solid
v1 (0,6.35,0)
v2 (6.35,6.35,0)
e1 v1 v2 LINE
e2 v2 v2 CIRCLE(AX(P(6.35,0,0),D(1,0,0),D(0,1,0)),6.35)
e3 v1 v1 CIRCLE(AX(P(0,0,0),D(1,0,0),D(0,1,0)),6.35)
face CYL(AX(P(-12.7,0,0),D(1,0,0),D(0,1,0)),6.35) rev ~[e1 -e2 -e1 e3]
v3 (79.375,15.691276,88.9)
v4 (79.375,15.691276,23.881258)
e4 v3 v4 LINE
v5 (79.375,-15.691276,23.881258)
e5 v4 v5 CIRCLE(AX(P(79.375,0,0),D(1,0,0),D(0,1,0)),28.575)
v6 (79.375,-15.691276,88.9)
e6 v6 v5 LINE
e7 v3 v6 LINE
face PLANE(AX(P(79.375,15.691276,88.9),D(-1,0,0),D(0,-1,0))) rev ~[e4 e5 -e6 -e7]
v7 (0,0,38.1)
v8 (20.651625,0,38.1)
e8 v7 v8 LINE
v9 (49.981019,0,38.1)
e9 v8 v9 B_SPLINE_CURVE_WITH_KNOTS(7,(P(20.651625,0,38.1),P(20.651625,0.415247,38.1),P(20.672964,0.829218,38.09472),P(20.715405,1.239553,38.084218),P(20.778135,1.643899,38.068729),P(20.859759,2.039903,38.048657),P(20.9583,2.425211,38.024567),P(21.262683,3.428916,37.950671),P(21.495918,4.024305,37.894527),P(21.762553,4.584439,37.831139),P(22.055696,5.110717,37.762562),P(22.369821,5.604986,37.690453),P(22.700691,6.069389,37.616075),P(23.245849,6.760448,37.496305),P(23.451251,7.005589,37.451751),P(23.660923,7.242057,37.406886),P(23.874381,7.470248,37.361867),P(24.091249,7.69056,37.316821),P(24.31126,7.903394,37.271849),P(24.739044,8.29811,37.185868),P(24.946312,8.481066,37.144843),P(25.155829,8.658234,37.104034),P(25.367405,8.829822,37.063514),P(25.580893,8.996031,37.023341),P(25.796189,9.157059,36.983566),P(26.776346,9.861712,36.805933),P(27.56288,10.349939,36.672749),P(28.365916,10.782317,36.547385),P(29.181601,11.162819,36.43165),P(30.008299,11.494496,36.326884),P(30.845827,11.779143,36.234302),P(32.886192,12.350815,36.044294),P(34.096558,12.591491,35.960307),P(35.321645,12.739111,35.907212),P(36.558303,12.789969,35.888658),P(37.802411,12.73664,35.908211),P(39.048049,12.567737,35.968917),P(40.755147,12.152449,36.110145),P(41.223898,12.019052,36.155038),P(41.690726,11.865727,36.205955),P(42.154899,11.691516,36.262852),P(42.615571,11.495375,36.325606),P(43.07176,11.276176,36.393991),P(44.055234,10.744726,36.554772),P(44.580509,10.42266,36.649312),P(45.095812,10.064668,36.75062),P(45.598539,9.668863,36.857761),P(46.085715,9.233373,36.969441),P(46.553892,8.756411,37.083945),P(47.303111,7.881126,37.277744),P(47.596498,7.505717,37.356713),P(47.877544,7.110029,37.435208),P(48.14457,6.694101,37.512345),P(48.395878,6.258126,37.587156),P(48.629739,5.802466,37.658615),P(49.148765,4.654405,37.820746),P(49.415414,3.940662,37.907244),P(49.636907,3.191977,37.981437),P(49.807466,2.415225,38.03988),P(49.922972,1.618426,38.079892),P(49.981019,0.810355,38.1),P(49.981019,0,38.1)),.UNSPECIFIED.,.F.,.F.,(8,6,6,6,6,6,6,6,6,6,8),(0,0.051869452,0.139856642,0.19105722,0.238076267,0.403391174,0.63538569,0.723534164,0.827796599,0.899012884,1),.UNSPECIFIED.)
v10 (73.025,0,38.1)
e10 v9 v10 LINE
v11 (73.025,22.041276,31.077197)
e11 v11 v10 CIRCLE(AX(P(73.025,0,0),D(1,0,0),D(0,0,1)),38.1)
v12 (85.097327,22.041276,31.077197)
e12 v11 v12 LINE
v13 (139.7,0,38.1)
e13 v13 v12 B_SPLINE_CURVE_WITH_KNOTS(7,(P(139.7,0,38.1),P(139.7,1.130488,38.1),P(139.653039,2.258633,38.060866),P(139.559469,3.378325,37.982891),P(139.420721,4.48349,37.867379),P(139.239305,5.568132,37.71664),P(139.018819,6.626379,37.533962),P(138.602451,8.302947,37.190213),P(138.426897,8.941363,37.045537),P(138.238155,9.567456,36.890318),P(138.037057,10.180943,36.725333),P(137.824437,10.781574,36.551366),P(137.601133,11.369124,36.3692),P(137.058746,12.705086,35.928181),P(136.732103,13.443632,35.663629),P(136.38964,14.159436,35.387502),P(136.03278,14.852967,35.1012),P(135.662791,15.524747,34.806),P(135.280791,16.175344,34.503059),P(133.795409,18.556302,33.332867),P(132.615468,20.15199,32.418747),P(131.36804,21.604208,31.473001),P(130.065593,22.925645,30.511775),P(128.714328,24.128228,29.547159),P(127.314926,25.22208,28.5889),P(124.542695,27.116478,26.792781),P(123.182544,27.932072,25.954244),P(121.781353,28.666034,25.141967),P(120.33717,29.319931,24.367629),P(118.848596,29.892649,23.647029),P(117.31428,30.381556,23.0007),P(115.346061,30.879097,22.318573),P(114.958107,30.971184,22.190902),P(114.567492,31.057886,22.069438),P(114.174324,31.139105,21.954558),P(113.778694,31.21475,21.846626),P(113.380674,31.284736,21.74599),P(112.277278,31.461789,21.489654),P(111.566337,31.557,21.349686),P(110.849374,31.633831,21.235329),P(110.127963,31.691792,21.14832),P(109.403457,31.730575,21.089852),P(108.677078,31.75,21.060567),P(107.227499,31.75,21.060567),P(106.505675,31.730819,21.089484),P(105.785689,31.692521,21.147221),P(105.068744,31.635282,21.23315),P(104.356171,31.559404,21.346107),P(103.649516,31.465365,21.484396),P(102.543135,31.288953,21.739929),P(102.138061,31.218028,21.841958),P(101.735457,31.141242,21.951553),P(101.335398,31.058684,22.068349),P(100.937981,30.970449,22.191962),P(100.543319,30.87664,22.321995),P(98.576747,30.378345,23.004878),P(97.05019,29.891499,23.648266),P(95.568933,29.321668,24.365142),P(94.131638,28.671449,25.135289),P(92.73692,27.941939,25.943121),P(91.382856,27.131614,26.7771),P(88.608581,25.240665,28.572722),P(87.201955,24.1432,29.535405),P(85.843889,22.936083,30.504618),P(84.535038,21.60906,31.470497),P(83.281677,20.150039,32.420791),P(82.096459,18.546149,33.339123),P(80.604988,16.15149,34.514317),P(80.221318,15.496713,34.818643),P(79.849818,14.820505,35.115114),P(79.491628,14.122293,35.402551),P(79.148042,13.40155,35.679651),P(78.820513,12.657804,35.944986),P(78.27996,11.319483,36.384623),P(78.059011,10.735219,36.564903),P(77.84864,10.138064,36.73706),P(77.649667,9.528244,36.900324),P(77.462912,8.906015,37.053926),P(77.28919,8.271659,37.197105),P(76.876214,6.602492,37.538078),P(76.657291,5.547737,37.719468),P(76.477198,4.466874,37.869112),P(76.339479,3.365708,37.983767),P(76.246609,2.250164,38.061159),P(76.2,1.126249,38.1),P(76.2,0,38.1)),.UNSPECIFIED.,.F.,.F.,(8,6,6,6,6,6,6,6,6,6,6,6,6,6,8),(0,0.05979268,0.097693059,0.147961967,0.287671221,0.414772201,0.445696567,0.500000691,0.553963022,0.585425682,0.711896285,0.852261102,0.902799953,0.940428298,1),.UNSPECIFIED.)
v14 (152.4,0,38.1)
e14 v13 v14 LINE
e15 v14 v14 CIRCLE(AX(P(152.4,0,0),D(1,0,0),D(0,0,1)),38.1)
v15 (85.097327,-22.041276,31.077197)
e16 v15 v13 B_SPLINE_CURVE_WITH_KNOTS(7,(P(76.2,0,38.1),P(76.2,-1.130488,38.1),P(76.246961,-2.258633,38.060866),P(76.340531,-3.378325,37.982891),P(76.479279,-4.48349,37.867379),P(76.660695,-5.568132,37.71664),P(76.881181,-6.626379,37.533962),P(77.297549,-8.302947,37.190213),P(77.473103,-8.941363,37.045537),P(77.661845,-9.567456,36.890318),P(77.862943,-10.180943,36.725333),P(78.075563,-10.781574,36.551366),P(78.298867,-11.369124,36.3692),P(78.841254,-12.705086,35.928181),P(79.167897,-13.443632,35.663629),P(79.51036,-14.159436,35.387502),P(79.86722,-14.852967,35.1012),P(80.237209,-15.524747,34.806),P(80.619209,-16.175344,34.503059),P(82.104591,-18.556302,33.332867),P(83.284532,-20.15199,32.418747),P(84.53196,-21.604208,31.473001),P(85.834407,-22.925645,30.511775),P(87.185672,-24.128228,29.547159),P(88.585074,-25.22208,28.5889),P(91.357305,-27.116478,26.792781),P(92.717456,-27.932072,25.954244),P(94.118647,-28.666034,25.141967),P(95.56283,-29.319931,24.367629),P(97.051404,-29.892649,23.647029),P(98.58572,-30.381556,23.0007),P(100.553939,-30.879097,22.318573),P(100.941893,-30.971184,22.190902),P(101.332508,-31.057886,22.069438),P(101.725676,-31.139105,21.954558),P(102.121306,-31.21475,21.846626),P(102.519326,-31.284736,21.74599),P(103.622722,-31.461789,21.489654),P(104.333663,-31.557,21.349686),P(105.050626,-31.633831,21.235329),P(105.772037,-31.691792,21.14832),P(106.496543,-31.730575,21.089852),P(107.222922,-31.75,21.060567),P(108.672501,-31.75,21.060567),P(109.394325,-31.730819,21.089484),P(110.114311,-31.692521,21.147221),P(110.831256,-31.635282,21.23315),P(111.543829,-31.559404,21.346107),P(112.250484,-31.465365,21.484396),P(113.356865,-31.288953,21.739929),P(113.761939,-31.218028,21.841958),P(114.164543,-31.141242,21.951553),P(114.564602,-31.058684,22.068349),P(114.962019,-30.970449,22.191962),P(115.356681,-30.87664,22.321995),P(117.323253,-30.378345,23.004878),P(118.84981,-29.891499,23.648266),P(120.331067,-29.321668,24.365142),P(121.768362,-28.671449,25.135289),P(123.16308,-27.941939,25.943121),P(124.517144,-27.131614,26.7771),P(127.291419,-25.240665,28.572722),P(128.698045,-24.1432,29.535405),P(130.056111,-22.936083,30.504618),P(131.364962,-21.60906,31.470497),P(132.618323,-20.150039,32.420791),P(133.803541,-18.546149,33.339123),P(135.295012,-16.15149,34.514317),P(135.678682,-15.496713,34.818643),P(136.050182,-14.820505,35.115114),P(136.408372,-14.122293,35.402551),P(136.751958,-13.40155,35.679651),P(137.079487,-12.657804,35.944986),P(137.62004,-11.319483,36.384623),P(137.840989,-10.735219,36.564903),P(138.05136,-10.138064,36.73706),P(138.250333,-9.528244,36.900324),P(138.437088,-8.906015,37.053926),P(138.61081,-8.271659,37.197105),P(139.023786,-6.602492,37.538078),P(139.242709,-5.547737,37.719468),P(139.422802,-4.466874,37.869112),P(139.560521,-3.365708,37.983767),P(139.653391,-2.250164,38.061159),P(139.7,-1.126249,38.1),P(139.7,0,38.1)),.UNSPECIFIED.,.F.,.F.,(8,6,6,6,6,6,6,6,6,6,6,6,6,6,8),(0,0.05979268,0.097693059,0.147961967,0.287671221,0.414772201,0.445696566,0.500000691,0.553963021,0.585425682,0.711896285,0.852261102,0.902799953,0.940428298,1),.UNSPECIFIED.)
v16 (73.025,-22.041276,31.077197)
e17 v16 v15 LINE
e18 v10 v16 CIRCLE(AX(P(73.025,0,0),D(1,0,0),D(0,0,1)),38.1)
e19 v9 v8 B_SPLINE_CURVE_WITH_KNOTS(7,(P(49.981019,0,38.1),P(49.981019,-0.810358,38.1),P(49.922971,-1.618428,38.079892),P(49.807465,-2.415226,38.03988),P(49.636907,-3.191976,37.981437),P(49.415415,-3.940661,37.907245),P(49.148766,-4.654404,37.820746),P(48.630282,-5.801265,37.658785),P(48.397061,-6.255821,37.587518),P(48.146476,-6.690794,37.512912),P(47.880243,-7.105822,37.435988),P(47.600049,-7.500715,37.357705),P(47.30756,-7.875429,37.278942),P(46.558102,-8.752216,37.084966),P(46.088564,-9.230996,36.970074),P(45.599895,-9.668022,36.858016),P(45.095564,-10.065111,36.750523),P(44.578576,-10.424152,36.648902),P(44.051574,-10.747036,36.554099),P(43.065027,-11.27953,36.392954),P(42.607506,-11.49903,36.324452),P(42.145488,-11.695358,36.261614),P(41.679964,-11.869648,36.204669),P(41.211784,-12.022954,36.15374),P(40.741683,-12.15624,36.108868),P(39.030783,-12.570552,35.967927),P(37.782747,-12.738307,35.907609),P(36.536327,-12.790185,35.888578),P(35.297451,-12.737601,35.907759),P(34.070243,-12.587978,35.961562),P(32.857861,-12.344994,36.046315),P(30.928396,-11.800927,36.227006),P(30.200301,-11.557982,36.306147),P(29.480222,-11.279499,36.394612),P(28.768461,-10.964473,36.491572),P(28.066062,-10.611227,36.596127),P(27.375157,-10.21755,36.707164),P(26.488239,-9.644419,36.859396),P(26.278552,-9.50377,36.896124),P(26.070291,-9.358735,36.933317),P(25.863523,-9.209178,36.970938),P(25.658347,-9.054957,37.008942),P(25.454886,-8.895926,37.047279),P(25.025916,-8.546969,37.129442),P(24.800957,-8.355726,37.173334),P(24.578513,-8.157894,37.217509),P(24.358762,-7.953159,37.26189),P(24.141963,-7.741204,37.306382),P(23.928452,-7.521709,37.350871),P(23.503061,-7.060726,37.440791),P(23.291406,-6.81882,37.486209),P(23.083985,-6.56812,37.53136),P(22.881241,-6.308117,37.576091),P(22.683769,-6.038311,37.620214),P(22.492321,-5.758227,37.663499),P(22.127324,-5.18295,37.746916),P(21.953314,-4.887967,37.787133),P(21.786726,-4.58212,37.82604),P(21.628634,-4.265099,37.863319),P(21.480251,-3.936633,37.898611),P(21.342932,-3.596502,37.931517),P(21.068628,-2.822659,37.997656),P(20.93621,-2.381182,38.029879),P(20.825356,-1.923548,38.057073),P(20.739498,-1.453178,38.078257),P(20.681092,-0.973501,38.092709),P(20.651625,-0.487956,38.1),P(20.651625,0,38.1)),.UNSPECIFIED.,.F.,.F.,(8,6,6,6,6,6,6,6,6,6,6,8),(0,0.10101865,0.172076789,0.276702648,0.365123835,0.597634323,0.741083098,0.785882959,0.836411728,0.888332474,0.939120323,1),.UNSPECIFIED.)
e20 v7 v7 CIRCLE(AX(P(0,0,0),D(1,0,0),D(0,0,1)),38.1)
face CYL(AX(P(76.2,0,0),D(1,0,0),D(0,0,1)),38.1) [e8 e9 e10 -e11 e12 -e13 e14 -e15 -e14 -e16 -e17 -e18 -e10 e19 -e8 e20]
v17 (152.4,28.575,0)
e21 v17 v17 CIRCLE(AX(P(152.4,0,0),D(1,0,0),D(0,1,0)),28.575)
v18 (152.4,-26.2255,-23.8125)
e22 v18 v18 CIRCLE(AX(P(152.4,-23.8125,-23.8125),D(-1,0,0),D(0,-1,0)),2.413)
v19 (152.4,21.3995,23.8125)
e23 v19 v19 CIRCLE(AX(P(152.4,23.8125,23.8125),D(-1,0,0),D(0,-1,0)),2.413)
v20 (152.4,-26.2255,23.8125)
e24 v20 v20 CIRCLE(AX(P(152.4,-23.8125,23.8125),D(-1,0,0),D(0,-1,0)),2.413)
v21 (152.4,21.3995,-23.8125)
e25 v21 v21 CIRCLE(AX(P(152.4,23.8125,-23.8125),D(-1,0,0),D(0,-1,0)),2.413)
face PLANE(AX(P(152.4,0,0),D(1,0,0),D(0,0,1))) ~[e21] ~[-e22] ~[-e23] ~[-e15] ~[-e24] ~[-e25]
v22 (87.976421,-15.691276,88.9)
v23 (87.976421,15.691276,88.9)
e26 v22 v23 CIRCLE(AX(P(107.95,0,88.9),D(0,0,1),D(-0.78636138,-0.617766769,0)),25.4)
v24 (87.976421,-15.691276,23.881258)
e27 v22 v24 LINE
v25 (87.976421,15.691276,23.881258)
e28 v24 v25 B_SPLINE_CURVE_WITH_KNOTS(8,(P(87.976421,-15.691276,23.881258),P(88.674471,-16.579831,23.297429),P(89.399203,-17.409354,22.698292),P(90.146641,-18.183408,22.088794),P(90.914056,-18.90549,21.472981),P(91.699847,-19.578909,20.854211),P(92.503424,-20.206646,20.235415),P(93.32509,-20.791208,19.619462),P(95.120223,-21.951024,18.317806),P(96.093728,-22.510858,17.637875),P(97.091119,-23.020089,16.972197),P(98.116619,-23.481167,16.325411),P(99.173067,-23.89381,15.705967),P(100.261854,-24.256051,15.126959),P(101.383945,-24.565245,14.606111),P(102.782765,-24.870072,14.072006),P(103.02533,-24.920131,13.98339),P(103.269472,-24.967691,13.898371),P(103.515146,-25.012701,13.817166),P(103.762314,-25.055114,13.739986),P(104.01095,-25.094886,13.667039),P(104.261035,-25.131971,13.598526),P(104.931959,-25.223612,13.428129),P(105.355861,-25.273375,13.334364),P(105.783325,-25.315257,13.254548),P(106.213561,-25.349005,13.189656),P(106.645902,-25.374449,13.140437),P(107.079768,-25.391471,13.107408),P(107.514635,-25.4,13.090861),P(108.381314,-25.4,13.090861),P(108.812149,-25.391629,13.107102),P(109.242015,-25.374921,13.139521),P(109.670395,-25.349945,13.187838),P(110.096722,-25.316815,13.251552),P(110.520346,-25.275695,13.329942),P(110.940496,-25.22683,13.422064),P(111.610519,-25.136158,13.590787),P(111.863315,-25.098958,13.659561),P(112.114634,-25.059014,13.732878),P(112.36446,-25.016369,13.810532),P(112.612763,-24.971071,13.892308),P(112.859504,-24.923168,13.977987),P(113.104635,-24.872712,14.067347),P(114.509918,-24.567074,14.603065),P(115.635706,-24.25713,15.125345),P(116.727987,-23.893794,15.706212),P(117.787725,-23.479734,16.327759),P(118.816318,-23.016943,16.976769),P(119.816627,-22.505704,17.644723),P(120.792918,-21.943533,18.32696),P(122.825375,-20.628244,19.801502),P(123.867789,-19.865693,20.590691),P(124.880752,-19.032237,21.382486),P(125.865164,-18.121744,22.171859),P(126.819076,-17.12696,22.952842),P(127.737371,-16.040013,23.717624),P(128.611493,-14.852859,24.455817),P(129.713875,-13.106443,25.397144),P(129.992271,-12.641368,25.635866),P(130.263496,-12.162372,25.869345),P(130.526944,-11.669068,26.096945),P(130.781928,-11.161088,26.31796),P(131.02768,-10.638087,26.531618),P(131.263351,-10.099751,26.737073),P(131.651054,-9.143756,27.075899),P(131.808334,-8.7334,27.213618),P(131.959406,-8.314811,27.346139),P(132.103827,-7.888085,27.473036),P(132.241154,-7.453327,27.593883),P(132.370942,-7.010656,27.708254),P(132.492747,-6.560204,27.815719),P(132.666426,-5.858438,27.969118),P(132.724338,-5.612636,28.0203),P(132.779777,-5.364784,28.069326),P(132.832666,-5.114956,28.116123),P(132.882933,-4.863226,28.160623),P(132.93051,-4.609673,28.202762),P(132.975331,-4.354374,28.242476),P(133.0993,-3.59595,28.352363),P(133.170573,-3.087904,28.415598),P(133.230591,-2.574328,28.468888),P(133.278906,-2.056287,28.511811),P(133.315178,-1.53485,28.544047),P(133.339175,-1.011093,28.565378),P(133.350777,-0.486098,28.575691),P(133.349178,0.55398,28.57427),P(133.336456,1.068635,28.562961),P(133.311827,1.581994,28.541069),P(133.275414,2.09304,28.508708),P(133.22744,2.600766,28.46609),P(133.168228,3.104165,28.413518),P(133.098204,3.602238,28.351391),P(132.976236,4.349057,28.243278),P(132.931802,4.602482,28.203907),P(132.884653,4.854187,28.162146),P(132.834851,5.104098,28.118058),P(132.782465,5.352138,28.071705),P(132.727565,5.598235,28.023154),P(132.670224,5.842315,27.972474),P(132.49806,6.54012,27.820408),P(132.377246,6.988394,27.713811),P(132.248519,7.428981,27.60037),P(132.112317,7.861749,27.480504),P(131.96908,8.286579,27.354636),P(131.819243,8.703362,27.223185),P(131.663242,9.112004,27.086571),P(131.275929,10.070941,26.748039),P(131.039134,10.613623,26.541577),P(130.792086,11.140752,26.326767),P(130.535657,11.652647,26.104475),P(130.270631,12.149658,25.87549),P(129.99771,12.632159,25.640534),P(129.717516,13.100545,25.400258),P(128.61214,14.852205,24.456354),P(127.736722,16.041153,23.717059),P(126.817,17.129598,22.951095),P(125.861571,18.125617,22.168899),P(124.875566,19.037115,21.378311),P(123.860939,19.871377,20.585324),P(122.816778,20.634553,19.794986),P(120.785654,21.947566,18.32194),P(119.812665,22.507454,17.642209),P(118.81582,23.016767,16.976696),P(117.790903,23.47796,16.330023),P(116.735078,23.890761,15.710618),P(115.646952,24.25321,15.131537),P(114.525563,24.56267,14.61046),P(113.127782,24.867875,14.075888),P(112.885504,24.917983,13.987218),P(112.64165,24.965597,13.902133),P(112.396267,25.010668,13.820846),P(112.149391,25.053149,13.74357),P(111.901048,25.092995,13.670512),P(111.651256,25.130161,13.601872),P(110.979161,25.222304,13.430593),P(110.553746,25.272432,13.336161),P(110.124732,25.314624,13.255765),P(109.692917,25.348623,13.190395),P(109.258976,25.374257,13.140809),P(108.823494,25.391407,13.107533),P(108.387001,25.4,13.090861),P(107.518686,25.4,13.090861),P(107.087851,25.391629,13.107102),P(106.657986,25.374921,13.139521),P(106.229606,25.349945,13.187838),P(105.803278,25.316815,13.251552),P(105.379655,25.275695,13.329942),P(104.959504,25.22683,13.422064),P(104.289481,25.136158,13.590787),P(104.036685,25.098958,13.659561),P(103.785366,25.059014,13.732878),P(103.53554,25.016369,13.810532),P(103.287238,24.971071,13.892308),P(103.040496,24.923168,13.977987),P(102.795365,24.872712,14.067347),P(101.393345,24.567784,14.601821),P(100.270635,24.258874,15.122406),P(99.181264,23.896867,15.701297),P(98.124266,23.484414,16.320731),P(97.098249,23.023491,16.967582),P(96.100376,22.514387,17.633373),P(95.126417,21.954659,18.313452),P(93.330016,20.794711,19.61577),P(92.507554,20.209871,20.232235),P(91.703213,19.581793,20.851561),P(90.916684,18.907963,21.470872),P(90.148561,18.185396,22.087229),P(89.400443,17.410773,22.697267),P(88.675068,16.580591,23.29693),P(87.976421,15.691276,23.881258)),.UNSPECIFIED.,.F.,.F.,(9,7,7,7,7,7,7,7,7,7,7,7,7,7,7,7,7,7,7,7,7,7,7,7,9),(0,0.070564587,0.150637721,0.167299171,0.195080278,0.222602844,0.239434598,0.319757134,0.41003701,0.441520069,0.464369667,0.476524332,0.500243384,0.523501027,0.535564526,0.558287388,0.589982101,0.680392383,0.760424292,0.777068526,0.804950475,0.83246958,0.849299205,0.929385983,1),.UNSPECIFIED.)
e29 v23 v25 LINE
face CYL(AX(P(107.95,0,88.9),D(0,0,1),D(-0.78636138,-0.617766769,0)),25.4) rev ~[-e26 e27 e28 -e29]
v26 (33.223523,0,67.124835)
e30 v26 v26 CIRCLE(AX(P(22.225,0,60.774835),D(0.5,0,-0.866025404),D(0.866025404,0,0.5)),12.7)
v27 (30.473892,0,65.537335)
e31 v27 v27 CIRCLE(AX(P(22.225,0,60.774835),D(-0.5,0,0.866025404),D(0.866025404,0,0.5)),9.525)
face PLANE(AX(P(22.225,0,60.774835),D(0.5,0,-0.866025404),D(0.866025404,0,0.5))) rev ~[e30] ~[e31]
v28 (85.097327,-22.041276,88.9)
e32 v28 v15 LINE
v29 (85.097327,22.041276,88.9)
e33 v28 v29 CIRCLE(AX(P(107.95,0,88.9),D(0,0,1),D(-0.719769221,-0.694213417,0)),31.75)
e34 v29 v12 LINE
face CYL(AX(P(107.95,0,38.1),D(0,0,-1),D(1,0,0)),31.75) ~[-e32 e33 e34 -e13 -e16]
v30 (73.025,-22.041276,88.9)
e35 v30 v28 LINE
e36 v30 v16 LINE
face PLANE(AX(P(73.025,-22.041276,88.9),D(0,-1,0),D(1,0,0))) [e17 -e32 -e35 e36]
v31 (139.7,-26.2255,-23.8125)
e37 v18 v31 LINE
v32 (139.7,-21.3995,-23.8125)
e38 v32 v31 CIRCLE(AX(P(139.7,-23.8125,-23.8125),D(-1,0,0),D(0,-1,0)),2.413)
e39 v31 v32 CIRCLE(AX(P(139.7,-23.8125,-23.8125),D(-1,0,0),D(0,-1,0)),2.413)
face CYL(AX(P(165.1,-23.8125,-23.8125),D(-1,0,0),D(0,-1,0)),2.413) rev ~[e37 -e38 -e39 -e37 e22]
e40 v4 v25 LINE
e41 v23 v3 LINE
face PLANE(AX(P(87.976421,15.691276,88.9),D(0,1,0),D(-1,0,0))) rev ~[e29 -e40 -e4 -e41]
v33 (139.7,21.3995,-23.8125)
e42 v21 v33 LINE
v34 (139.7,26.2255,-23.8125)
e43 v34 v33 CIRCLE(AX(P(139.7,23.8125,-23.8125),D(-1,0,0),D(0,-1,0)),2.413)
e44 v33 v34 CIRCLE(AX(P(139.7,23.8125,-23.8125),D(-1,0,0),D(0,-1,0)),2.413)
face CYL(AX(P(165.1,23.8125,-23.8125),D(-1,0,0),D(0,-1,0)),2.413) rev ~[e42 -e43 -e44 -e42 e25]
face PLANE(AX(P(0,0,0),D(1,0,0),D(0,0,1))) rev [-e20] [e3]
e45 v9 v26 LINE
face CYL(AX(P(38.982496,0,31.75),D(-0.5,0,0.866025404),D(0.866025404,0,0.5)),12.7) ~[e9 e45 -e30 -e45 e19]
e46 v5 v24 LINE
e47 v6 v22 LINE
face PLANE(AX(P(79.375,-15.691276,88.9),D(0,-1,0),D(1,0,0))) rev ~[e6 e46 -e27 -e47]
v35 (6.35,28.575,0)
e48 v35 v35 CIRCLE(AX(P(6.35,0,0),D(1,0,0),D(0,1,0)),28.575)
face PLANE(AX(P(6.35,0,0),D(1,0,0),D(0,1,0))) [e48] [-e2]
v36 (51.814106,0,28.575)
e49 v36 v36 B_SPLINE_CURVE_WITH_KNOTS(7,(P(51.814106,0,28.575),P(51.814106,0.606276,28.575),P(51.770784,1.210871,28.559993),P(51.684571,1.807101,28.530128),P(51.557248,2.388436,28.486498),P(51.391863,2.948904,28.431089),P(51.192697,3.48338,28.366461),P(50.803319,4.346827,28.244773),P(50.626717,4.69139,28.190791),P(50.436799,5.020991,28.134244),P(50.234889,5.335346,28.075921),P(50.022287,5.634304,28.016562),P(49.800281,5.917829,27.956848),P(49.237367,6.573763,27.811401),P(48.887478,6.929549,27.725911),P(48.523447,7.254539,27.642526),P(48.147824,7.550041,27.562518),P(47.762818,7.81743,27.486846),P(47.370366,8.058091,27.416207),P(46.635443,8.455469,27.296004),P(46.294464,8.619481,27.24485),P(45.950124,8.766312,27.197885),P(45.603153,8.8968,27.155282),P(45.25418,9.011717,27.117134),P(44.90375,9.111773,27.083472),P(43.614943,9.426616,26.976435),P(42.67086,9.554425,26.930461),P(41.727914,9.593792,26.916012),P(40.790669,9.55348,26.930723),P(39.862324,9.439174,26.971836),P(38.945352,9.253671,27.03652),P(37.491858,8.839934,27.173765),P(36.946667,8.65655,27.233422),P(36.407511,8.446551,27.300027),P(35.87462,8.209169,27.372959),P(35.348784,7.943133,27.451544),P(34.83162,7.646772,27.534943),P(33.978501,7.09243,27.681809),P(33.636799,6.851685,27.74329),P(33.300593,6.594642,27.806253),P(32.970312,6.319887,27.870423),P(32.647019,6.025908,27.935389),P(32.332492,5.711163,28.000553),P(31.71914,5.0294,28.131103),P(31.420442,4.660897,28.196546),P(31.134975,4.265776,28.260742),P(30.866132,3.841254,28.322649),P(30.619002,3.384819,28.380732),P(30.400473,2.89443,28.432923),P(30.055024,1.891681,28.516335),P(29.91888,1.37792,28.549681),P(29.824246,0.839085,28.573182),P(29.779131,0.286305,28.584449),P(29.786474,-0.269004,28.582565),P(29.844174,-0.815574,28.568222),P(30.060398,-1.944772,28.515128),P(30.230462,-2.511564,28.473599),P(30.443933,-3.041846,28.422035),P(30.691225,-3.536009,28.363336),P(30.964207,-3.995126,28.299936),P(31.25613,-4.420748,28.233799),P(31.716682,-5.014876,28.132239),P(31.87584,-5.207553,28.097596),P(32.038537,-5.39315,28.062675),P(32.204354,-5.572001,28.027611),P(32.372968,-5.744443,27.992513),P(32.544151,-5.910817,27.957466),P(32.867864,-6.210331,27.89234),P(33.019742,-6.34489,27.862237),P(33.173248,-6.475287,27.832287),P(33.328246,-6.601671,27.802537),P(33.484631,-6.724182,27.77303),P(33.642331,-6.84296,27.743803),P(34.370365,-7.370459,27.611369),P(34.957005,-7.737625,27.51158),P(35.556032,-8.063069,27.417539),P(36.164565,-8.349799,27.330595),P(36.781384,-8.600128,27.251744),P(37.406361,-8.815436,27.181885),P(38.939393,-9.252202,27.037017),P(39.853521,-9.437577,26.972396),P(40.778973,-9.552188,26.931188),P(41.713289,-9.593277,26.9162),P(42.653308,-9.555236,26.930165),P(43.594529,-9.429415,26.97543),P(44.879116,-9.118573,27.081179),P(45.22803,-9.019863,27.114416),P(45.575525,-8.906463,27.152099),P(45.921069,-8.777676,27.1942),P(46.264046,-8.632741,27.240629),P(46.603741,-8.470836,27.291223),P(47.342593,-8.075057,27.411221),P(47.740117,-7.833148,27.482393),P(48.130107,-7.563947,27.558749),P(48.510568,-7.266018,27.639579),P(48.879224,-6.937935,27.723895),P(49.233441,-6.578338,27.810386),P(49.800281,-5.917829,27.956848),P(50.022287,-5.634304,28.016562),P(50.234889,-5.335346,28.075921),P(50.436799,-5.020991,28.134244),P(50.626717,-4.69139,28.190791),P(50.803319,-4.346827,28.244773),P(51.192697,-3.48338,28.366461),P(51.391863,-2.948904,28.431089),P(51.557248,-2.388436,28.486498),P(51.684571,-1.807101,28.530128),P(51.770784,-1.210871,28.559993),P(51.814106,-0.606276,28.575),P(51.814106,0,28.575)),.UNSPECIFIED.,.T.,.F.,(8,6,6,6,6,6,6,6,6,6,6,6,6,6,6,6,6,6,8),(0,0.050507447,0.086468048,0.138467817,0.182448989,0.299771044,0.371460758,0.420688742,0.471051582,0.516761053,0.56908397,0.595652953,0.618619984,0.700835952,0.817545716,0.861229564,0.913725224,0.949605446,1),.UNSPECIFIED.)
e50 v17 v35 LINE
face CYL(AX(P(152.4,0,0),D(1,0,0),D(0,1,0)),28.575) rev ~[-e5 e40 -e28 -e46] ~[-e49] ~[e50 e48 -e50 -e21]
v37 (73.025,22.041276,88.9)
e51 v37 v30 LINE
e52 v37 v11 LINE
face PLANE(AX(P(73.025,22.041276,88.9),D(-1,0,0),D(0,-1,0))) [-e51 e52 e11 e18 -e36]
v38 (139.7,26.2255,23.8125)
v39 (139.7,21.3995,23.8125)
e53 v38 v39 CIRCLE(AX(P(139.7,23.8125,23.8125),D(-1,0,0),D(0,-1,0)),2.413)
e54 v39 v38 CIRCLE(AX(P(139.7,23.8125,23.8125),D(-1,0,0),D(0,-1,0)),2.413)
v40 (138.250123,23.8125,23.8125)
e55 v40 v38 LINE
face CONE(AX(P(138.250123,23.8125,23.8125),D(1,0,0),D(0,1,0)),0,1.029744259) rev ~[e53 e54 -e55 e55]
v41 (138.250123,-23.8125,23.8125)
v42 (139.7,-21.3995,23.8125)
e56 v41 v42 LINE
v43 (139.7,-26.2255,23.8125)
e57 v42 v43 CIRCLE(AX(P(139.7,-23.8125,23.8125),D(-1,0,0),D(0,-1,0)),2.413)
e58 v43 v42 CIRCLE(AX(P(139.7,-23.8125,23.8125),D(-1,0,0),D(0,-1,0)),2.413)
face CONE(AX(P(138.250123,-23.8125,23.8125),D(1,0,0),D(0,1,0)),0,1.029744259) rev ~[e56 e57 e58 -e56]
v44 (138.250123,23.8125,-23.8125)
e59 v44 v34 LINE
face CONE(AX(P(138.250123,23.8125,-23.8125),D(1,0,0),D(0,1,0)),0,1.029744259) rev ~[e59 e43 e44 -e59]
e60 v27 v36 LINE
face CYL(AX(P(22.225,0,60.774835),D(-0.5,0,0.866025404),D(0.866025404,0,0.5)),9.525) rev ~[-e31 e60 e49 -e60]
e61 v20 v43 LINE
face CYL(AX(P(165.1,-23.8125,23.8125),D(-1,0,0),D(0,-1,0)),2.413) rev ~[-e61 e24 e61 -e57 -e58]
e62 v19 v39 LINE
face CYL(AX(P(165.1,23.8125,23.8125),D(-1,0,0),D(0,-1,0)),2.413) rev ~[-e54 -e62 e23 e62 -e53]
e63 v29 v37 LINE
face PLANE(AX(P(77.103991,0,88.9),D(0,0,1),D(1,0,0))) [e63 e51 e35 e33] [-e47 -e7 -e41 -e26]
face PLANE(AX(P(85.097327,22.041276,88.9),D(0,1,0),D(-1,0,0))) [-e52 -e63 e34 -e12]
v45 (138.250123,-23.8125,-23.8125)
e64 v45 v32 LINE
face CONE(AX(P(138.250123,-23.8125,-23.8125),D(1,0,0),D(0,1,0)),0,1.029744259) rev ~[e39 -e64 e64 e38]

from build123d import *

# Parameters (mm, degrees)
F0_W      = 152.4
F0_H      = 38.1
F3_R      = 31.75
F4_DEPTH  = 25.4
F5_DEPTH  = 50.8
F7_DEPTH  = 76.2
F11_DEPTH = 76.2
F12_R     = 28.575
F13_DEPTH = 146.05
F14_R     = 9.525
F15_DEPTH = 50.8
F17_D     = 4.826
F17_DEPTH = 12.7
F17_TIP   = 1.4498766737
F19_D     = 12.7
F19_DEPTH = 12.7
F19_TIP   = 3.8154649308


# Not quite as in the source:
# - a feature names something its author has since deleted; it is built from what else it names


with BuildPart() as f1:
    # F0 (on Front) → F1 (revolve)
    with BuildSketch(Plane.XZ):
        with Locations((76.2, 19.05)):
            Rectangle(F0_W, F0_H)
    revolve(axis=Axis((76.2, 0, 0), (1, 0, 0)))

    # F3 (on offset) → F4 (join)
    with BuildSketch(Plane.XY.offset(38.1)):
        with Locations((107.95, 0)):
            Circle(F3_R)
    extrude(amount=-F4_DEPTH)

    # F5 (add): a face of the model
    f5_faces = [f1.faces().sort_by_distance(p)[0] for p in [
        (107.95, 0, 38.1),
    ]]
    extrude(f5_faces, amount=F5_DEPTH)

    # F6 (on face) → F7 (join)
    with BuildSketch(Plane.XY.offset(88.9)):
        with BuildLine():
            Line((73.025, -22.0412760045), (85.097327244, -22.0412760045))
            ThreePointArc((85.097327244, -22.0412760045), (76.2, 0), (85.097327244, 22.0412760045))
            Line((85.097327244, 22.0412760045), (73.025, 22.0412760045))
            Line((73.025, 22.0412760045), (73.025, -22.0412760045))
        make_face()
    extrude(amount=-F7_DEPTH)

    # F8 (on Front) → F9 (revolve)
    with BuildSketch(Plane.XZ):
        Polygon((33.2235226281, 67.1248349075), (22.225, 60.7748349075), (38.982496247, 31.75), (49.9810188751, 38.1), align=None)
    revolve(axis=Axis((30.6037481235, 0, 46.2624174538), (0.5, 0, -0.8660254038)))

    # F10 (on face) → F11 (cut)
    with BuildSketch(Plane.XY.offset(88.9)):
        with BuildLine():
            Line((79.3750002146, -15.69127579), (87.9764211223, -15.69127579))
            ThreePointArc((87.9764211223, -15.69127579), (133.3499997854, 0), (87.9764211223, 15.69127579))
            Line((87.9764211223, 15.69127579), (79.3750002146, 15.69127579))
            Line((79.3750002146, 15.69127579), (79.3750002146, -15.69127579))
        make_face()
    extrude(amount=-F11_DEPTH, mode=Mode.SUBTRACT)

    # F12 (on face) → F13 (cut)
    with BuildSketch(Plane.YZ.offset(152.4)):
        Circle(F12_R)
    extrude(amount=-F13_DEPTH, mode=Mode.SUBTRACT)

    # F14 (on face) → F15 (cut)
    with BuildSketch(Plane(origin=(-20.7600254704, 0, 35.9574188811), x_dir=(0.8660254038, 0, 0.5), z_dir=(-0.5, 0, 0.8660254038))):
        with Locations((49.6348320529, 0)):
            Circle(F14_R)
    extrude(amount=-F15_DEPTH, mode=Mode.SUBTRACT)

    # F17
    with Locations(Plane.YZ.offset(152.4)):
        with Locations((-23.8125, 23.8125), (23.8125, 23.8125), (23.8125, -23.8125), (-23.8125, -23.8125)):
            Hole(F17_D / 2, depth=F17_DEPTH)
            with Locations((0, 0, -(F17_DEPTH + F17_TIP / 2))):  # 118° drill point
                Cone(0, F17_D / 2, F17_TIP, mode=Mode.SUBTRACT)

    # F19
    with Locations(Plane(origin=(0, 0, 0), x_dir=(0, -1, 0), z_dir=(-1, 0, 0))):
        with Locations((0, 0)):
            Hole(F19_D / 2, depth=F19_DEPTH)
            with Locations((0, 0, -(F19_DEPTH + F19_TIP / 2))):  # 118° drill point
                Cone(0, F19_D / 2, F19_TIP, mode=Mode.SUBTRACT)


solid = f1.part
